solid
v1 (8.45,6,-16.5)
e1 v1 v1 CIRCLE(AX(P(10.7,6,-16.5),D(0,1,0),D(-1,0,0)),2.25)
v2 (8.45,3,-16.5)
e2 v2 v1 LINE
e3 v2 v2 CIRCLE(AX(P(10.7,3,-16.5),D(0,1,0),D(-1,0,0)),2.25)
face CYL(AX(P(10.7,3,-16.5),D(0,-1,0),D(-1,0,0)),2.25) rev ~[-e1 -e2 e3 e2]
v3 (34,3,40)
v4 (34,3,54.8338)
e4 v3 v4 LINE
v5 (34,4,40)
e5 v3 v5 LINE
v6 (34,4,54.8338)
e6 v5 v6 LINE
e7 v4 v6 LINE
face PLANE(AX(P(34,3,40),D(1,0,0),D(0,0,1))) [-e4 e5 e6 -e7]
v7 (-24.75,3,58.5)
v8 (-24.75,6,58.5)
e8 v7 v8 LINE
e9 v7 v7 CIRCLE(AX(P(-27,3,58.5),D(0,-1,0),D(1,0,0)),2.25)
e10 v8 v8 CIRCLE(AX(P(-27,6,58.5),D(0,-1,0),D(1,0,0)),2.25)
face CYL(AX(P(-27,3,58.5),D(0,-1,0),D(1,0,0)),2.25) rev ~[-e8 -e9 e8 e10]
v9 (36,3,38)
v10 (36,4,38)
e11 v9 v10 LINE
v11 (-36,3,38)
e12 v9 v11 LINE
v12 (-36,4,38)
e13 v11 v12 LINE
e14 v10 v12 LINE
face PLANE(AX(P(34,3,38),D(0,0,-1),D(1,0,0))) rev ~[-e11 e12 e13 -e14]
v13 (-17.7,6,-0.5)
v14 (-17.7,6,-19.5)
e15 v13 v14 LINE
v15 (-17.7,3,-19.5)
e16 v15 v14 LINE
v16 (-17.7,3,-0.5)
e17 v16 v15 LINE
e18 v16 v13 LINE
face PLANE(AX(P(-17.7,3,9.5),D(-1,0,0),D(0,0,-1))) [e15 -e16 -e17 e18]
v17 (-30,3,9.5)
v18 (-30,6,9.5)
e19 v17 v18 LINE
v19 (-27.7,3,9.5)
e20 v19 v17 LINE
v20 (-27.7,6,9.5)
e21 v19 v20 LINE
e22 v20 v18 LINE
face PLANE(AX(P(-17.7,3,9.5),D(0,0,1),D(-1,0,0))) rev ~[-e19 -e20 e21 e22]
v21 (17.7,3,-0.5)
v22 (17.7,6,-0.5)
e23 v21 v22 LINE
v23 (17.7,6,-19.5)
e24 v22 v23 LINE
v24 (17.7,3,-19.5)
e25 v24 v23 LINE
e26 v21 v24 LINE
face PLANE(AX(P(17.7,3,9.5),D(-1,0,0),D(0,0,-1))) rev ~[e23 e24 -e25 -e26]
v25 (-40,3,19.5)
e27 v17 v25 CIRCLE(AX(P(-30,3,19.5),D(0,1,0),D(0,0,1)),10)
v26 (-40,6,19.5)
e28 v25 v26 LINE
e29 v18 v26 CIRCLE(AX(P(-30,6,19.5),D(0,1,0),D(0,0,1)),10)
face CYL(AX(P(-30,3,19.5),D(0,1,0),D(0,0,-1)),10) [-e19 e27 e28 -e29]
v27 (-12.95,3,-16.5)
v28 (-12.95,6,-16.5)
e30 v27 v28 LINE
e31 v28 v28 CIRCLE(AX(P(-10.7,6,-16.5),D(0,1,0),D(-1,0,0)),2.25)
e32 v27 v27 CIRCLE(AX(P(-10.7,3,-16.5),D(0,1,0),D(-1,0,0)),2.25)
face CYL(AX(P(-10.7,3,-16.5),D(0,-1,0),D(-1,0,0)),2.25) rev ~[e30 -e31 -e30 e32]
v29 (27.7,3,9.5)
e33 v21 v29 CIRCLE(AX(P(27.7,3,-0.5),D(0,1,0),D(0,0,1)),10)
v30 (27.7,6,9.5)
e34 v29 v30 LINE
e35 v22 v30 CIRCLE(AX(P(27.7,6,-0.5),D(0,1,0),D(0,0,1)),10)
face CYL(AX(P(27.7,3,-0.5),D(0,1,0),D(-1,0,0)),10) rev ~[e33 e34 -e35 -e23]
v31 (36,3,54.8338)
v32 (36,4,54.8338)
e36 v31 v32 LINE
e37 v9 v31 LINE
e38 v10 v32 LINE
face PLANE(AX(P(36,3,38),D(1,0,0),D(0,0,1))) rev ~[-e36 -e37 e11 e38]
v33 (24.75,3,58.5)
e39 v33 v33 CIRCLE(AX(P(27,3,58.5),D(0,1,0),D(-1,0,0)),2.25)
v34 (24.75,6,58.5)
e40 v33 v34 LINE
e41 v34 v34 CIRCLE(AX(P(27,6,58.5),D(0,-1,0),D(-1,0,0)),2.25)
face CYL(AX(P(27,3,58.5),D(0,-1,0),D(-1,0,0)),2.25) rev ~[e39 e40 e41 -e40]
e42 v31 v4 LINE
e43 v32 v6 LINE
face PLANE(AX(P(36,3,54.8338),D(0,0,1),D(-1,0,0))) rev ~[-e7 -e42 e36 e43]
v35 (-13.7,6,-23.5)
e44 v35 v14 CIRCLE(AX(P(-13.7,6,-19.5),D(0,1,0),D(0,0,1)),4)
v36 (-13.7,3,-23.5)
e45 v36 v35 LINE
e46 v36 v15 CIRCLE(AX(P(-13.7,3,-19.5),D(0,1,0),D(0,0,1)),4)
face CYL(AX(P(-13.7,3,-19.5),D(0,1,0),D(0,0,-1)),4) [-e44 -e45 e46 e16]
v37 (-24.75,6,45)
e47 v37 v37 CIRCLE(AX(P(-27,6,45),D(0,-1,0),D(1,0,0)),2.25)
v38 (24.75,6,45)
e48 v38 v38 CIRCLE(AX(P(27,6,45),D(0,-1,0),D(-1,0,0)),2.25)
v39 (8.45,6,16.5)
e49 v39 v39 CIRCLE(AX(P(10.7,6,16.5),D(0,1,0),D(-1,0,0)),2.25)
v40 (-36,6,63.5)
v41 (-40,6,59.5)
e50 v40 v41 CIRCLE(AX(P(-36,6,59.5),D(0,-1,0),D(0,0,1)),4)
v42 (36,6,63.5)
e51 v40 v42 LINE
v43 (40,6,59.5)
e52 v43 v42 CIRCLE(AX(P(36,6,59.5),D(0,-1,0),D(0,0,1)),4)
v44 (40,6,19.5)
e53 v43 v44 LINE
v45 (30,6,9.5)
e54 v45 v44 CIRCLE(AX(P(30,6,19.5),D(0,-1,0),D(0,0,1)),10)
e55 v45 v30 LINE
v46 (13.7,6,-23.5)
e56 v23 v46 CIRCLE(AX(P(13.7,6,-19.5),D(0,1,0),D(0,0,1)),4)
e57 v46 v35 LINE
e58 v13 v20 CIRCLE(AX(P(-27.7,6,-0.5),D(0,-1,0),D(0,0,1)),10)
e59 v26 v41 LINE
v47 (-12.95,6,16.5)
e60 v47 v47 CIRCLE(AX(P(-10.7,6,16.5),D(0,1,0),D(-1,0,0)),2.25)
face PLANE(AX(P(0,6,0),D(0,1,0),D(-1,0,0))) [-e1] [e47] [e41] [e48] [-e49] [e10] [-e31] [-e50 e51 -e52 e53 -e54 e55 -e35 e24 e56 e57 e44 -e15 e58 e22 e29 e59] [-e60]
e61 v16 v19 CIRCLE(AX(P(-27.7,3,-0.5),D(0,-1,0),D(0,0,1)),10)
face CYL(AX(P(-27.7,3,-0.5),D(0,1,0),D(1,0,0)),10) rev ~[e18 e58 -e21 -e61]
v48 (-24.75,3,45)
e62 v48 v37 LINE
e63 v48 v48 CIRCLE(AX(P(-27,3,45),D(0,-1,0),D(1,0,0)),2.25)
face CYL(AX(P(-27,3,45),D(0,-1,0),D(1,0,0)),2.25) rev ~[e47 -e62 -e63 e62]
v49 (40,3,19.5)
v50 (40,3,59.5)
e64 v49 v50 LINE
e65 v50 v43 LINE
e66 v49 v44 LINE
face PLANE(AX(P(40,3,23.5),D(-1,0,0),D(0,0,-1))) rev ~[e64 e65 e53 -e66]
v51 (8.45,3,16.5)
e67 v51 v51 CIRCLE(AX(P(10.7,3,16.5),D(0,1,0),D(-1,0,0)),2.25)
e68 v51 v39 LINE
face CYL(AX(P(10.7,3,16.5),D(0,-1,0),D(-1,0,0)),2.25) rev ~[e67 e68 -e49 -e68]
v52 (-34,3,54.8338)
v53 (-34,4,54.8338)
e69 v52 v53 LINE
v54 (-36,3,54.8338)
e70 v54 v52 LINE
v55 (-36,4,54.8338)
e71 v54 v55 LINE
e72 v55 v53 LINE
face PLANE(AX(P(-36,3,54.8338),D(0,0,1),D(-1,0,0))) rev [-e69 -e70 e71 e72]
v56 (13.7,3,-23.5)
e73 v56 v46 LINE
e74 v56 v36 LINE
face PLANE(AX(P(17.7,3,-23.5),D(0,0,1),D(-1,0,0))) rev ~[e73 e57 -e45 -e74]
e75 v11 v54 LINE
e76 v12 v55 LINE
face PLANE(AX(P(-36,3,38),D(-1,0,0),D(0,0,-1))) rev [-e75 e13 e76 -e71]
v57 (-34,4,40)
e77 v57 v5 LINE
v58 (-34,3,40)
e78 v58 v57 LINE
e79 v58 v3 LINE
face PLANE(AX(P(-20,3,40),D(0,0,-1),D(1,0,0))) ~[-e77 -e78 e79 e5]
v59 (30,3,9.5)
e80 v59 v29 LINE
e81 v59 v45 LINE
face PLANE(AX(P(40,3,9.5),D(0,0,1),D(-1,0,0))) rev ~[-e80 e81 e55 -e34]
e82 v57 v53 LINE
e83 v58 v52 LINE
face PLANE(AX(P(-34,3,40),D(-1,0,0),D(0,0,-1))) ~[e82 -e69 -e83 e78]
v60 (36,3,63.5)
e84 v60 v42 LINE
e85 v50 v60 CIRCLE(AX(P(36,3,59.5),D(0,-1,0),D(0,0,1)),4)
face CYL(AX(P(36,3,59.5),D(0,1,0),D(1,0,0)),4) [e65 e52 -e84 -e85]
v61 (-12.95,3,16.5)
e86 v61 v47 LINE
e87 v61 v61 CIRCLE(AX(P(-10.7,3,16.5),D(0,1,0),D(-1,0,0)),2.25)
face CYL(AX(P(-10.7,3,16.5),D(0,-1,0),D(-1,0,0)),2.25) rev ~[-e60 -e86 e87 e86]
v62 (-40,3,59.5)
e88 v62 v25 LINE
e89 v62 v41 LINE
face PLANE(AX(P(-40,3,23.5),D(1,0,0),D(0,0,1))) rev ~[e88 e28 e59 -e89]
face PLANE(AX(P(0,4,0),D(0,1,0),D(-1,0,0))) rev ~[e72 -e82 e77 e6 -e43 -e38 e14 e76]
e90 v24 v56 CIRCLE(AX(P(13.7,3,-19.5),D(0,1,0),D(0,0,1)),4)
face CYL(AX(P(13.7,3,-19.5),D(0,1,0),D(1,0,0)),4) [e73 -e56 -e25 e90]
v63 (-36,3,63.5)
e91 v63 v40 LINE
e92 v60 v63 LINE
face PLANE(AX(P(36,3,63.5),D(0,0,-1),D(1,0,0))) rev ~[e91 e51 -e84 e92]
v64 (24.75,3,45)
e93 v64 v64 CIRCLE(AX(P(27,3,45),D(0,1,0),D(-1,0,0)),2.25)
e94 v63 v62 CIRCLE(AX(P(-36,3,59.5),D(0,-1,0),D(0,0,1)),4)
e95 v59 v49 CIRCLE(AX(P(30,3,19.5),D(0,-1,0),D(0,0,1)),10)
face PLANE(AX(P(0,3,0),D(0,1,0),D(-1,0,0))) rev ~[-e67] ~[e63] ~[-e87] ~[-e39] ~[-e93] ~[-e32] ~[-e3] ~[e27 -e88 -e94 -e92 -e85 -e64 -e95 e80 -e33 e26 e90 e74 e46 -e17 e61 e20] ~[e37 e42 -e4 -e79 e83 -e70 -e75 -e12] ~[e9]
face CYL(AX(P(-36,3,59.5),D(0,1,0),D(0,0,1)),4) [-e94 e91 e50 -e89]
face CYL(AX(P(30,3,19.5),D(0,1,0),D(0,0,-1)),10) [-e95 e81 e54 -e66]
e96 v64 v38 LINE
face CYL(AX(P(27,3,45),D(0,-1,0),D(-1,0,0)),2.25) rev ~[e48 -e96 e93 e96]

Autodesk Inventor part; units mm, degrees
ref_plane "YZ Plane" through (0, 0, 0) normal (1, 0, 0) x (0, 1, 0)
ref_plane "XY Plane" through (0, 0, 0) normal (0, 0, 1) x (1, 0, 0)
sketch "Sketch1" plane through (0, 0, 0) normal (0, 1, 0) x (-1, 0, 0)
  line L0 (-51.65, 23.5) -> (51.65, 23.5)
  line L1 (54.65, 20.5) -> (54.65, -20.5)
  line L2 (51.65, -23.5) -> (-51.65, -23.5)
  line L3 (-54.65, -20.5) -> (-54.65, 20.5)
  circle A0 centre (-47.65, 16.5) radius 2.25
  circle A1 centre (47.65, 16.5) radius 2.25
  circle A2 centre (-47.65, 16.5) radius 26.75 construction
  circle A3 centre (-10.7, 16.5) radius 2.25
  circle A4 centre (-10.7, 16.5) radius 11.2 construction
  line L4 (-21.9, 16.5) -> (-21.9, 6.8604)
  line L5 (-20.9, 16.5) -> (-20.9, 6.8604)
  circle A5 centre (10.7, 16.5) radius 2.25
  circle A6 centre (10.7, 16.5) radius 11.2 construction
  line L6 (-0.5, 16.5) -> (-0.5, 5.694)
  line L7 (0.5, 16.5) -> (0.5, 5.694)
  circle A7 centre (47.65, 16.5) radius 26.75 construction
  line L8 (20.9, 16.5) -> (20.9, 5.8426)
  line L9 (21.9, 16.5) -> (21.9, 5.8426)
  arc A8 (-51.65, 23.5) -> (-54.65, 20.5) centre (-51.65, 20.5) ccw
  arc A9 (-54.65, -20.5) -> (-51.65, -23.5) centre (-51.65, -20.5) ccw
  arc A10 (54.65, 20.5) -> (51.65, 23.5) centre (51.65, 20.5) ccw
  arc A11 (51.65, -23.5) -> (54.65, -20.5) centre (51.65, -20.5) ccw
  line L10 (-84.9483, 16.5) -> (77.5332, 16.5) construction
  line L11 (-54.65, 0) -> (54.65, 0)
  line L12 (10.7, 30.5) -> (10.7, -33.5) construction
  circle A12 centre (10.7, -16.5) radius 2.25
  line L13 (5, -8.5) -> (18, -8.5) construction
  line L14 (3.7, -4.5) -> (3.7, -33.5) construction
  line L15 (-6.3, -4.5) -> (-6.3, -33.5) construction
  line L16 (-1.3, -33.5) -> (-1.3, -4.5) construction
  circle A13 centre (-1.3, -38.9) radius 2.25
  circle A14 centre (-1.3, -8.5) radius 2.25
  line L17 (-17.7373, -23.5) -> (14.2274, -23.5)
  line L18 (14.2274, -23.5) -> (14.2274, -45.3565)
  line L19 (14.2274, -45.3565) -> (-17.7373, -45.3565)
  line L20 (-17.7373, -45.3565) -> (-17.7373, -23.5)
  line L21 (-40.65, 5) -> (-30.65, 5)
  line L22 (-30.65, 5) -> (-30.65, -5)
  line L23 (-30.65, -5) -> (-40.65, -5)
  line L24 (-40.65, -5) -> (-40.65, 5)
  line L25 (-42.65, -7) -> (-28.65, -7)
  line L26 (-28.65, -7) -> (-28.65, 7)
  line L27 (-28.65, 7) -> (-42.65, 7)
  line L28 (-42.65, 7) -> (-42.65, -7)
  point P0 (0, 0)
  point P1 (-54.65, 23.5)
  point P2 (-54.65, -23.5)
  point P3 (0, 23.5)
  point P4 (-35.65, 5)
  point P5 (-30.65, 0)
  dimension "d5" = 53.5
  dimension "d12" = 53.5
  dimension "d1" = 4.5
  dimension "d2" = 7
  dimension "d3" = 4.5
  dimension "d4" = 7
  dimension "d6" = 4.5
  dimension "d7" = 22.4
  dimension "d8" = 1
  dimension "d9" = 4.5
  dimension "d10" = 22.4
  dimension "d11" = 1
  dimension "d13" = 1
  dimension "d14" = 3
  dimension "d23" = 16.5
  dimension "d24" = 7
  dimension "d27" = 8
  dimension "d28" = 7
  dimension "d29" = 10
  dimension "d30" = 5
  dimension "d31" = 4.5
  dimension "d32" = 4.5
  dimension "d33" = 30.4
  dimension "d38" = 0
  dimension "d40" = 10
  dimension "d41" = 10
  dimension "d43" = 2
  dimension "d47" = 12
ref_plane "Work Plane1" through (0, 3, 0) normal (0, 1, 0) x (-1, 0, 0)
sketch "Sketch3" plane through (0, 3, 0) normal (0, 1, 0) x (-1, 0, 0)
  circle A0 centre (-10.7, -16.5) radius 2.25
  circle A1 centre (10.7, -16.5) radius 2.25
  circle A2 centre (10.7, 16.5) radius 2.25
  circle A3 centre (-10.7, 16.5) radius 2.25
  line L0 (-17.7, -23.5) -> (17.7, -23.5)
  line L1 (17.7, 23.5) -> (-17.7, 23.5)
  line L2 (-17.7, 23.5) -> (-17.7, -23.5)
  line L3 (17.7, 23.5) -> (17.7, -23.5)
  line L4 (-40, 23.5) -> (40, 23.5)
  line L5 (40, 23.5) -> (40, 63.5)
  line L6 (40, 63.5) -> (-40, 63.5)
  line L7 (-40, 63.5) -> (-40, 23.5)
  line L8 (-20, 63.5) -> (20, 63.5)
  line L9 (20, 63.5) -> (20, 40)
  line L10 (20, 40) -> (-20, 40)
  line L11 (-20, 40) -> (-20, 63.5)
  line L12 (0, 0) -> (0, -39.7707) construction
  line L13 (0, 40) -> (0, 63.5) construction
  line L14 (-40, 23.5) -> (-40, 9.5)
  line L15 (-40, 9.5) -> (40, 9.5)
  line L16 (40, 9.5) -> (40, 23.5)
  circle A4 centre (-27, 58.5) radius 2.25
  line L17 (-20, 40) -> (-34, 40)
  line L18 (-34, 40) -> (-34, 63.5)
  line L19 (-34, 63.5) -> (-20, 63.5)
  line L20 (-20, 63.5) -> (-20, 40)
  circle A5 centre (-27, 45) radius 2.25
  line L21 (-20, 38) -> (-34, 38)
  line L22 (-36, 38) -> (-36, 63.5)
  line L23 (-20, 38) -> (-20, 40)
  line L24 (-36, 63.5) -> (-34, 63.5)
  line L25 (20, 40) -> (20, 38)
  line L26 (-34, 38) -> (-36, 38)
  line L27 (-20, 38) -> (20, 38)
  line L28 (-36, 54.8338) -> (-34, 54.8338)
  point P0 (0, 63.5)
  point P1 (0, 23.5)
  point P2 (-27, 63.5)
  dimension "d67" = 7
  dimension "d73" = 7
  dimension "d74" = 7
  dimension "d84" = 7
  dimension "d86" = 7
  dimension "d87" = 40
  dimension "d88" = 80
  dimension "d91" = 40
  dimension "d92" = 23.5
  dimension "d96" = 4.5
  dimension "d97" = 7
  dimension "d98" = 4.5
  dimension "d99" = 7
  dimension "d100" = 5
  dimension "d101" = 4.5
  dimension "d102" = 7
  dimension "d103" = 5
  dimension "d104" = 2
extrude "Extrusion8" add sketch "Sketch3" along normal blind 3 contours L2 L15 L3 L0 | L15 L14 L4 L2 | L2 L1 L3 L15 | L3 L4 L16 L15 | L4 L7 L6 L22 L26 L21 L27 L25 L9 L5 L1 | L6 L18 L28 L22 | L9 L10 L11 L6 | L6 L11 L17 L18 | L28 L18 L17 L23 L21 L26 L22 | L25 L27 L23 L10 | A4 | A5
extrude "Extrusion9" cut sketch "Sketch3" along normal blind 1 contours L28 L18 L17 L23 L21 L26 L22 | L25 L27 L23 L10
extrude "Extrusion10" cut sketch "Sketch3" along normal blind 10 contours A4 | A5
mirror "Mirror4" about plane through (0, 0, 0) normal (1, 0, 0) of "Extrusion9", "Extrusion10"
fillet "Fillet3" radius 10 4 edges at (-40, 4.5, 9.5) (-17.7, 4.5, 9.5) (17.7, 4.5, 9.5) (40, 4.5, 9.5)
fillet "Fillet4" radius 4 4 edges at (-40, 4.5, 63.5) (40, 4.5, 63.5) (-17.7, 4.5, -23.5) (17.7, 4.5, -23.5)
properties part number "OuterBar"
